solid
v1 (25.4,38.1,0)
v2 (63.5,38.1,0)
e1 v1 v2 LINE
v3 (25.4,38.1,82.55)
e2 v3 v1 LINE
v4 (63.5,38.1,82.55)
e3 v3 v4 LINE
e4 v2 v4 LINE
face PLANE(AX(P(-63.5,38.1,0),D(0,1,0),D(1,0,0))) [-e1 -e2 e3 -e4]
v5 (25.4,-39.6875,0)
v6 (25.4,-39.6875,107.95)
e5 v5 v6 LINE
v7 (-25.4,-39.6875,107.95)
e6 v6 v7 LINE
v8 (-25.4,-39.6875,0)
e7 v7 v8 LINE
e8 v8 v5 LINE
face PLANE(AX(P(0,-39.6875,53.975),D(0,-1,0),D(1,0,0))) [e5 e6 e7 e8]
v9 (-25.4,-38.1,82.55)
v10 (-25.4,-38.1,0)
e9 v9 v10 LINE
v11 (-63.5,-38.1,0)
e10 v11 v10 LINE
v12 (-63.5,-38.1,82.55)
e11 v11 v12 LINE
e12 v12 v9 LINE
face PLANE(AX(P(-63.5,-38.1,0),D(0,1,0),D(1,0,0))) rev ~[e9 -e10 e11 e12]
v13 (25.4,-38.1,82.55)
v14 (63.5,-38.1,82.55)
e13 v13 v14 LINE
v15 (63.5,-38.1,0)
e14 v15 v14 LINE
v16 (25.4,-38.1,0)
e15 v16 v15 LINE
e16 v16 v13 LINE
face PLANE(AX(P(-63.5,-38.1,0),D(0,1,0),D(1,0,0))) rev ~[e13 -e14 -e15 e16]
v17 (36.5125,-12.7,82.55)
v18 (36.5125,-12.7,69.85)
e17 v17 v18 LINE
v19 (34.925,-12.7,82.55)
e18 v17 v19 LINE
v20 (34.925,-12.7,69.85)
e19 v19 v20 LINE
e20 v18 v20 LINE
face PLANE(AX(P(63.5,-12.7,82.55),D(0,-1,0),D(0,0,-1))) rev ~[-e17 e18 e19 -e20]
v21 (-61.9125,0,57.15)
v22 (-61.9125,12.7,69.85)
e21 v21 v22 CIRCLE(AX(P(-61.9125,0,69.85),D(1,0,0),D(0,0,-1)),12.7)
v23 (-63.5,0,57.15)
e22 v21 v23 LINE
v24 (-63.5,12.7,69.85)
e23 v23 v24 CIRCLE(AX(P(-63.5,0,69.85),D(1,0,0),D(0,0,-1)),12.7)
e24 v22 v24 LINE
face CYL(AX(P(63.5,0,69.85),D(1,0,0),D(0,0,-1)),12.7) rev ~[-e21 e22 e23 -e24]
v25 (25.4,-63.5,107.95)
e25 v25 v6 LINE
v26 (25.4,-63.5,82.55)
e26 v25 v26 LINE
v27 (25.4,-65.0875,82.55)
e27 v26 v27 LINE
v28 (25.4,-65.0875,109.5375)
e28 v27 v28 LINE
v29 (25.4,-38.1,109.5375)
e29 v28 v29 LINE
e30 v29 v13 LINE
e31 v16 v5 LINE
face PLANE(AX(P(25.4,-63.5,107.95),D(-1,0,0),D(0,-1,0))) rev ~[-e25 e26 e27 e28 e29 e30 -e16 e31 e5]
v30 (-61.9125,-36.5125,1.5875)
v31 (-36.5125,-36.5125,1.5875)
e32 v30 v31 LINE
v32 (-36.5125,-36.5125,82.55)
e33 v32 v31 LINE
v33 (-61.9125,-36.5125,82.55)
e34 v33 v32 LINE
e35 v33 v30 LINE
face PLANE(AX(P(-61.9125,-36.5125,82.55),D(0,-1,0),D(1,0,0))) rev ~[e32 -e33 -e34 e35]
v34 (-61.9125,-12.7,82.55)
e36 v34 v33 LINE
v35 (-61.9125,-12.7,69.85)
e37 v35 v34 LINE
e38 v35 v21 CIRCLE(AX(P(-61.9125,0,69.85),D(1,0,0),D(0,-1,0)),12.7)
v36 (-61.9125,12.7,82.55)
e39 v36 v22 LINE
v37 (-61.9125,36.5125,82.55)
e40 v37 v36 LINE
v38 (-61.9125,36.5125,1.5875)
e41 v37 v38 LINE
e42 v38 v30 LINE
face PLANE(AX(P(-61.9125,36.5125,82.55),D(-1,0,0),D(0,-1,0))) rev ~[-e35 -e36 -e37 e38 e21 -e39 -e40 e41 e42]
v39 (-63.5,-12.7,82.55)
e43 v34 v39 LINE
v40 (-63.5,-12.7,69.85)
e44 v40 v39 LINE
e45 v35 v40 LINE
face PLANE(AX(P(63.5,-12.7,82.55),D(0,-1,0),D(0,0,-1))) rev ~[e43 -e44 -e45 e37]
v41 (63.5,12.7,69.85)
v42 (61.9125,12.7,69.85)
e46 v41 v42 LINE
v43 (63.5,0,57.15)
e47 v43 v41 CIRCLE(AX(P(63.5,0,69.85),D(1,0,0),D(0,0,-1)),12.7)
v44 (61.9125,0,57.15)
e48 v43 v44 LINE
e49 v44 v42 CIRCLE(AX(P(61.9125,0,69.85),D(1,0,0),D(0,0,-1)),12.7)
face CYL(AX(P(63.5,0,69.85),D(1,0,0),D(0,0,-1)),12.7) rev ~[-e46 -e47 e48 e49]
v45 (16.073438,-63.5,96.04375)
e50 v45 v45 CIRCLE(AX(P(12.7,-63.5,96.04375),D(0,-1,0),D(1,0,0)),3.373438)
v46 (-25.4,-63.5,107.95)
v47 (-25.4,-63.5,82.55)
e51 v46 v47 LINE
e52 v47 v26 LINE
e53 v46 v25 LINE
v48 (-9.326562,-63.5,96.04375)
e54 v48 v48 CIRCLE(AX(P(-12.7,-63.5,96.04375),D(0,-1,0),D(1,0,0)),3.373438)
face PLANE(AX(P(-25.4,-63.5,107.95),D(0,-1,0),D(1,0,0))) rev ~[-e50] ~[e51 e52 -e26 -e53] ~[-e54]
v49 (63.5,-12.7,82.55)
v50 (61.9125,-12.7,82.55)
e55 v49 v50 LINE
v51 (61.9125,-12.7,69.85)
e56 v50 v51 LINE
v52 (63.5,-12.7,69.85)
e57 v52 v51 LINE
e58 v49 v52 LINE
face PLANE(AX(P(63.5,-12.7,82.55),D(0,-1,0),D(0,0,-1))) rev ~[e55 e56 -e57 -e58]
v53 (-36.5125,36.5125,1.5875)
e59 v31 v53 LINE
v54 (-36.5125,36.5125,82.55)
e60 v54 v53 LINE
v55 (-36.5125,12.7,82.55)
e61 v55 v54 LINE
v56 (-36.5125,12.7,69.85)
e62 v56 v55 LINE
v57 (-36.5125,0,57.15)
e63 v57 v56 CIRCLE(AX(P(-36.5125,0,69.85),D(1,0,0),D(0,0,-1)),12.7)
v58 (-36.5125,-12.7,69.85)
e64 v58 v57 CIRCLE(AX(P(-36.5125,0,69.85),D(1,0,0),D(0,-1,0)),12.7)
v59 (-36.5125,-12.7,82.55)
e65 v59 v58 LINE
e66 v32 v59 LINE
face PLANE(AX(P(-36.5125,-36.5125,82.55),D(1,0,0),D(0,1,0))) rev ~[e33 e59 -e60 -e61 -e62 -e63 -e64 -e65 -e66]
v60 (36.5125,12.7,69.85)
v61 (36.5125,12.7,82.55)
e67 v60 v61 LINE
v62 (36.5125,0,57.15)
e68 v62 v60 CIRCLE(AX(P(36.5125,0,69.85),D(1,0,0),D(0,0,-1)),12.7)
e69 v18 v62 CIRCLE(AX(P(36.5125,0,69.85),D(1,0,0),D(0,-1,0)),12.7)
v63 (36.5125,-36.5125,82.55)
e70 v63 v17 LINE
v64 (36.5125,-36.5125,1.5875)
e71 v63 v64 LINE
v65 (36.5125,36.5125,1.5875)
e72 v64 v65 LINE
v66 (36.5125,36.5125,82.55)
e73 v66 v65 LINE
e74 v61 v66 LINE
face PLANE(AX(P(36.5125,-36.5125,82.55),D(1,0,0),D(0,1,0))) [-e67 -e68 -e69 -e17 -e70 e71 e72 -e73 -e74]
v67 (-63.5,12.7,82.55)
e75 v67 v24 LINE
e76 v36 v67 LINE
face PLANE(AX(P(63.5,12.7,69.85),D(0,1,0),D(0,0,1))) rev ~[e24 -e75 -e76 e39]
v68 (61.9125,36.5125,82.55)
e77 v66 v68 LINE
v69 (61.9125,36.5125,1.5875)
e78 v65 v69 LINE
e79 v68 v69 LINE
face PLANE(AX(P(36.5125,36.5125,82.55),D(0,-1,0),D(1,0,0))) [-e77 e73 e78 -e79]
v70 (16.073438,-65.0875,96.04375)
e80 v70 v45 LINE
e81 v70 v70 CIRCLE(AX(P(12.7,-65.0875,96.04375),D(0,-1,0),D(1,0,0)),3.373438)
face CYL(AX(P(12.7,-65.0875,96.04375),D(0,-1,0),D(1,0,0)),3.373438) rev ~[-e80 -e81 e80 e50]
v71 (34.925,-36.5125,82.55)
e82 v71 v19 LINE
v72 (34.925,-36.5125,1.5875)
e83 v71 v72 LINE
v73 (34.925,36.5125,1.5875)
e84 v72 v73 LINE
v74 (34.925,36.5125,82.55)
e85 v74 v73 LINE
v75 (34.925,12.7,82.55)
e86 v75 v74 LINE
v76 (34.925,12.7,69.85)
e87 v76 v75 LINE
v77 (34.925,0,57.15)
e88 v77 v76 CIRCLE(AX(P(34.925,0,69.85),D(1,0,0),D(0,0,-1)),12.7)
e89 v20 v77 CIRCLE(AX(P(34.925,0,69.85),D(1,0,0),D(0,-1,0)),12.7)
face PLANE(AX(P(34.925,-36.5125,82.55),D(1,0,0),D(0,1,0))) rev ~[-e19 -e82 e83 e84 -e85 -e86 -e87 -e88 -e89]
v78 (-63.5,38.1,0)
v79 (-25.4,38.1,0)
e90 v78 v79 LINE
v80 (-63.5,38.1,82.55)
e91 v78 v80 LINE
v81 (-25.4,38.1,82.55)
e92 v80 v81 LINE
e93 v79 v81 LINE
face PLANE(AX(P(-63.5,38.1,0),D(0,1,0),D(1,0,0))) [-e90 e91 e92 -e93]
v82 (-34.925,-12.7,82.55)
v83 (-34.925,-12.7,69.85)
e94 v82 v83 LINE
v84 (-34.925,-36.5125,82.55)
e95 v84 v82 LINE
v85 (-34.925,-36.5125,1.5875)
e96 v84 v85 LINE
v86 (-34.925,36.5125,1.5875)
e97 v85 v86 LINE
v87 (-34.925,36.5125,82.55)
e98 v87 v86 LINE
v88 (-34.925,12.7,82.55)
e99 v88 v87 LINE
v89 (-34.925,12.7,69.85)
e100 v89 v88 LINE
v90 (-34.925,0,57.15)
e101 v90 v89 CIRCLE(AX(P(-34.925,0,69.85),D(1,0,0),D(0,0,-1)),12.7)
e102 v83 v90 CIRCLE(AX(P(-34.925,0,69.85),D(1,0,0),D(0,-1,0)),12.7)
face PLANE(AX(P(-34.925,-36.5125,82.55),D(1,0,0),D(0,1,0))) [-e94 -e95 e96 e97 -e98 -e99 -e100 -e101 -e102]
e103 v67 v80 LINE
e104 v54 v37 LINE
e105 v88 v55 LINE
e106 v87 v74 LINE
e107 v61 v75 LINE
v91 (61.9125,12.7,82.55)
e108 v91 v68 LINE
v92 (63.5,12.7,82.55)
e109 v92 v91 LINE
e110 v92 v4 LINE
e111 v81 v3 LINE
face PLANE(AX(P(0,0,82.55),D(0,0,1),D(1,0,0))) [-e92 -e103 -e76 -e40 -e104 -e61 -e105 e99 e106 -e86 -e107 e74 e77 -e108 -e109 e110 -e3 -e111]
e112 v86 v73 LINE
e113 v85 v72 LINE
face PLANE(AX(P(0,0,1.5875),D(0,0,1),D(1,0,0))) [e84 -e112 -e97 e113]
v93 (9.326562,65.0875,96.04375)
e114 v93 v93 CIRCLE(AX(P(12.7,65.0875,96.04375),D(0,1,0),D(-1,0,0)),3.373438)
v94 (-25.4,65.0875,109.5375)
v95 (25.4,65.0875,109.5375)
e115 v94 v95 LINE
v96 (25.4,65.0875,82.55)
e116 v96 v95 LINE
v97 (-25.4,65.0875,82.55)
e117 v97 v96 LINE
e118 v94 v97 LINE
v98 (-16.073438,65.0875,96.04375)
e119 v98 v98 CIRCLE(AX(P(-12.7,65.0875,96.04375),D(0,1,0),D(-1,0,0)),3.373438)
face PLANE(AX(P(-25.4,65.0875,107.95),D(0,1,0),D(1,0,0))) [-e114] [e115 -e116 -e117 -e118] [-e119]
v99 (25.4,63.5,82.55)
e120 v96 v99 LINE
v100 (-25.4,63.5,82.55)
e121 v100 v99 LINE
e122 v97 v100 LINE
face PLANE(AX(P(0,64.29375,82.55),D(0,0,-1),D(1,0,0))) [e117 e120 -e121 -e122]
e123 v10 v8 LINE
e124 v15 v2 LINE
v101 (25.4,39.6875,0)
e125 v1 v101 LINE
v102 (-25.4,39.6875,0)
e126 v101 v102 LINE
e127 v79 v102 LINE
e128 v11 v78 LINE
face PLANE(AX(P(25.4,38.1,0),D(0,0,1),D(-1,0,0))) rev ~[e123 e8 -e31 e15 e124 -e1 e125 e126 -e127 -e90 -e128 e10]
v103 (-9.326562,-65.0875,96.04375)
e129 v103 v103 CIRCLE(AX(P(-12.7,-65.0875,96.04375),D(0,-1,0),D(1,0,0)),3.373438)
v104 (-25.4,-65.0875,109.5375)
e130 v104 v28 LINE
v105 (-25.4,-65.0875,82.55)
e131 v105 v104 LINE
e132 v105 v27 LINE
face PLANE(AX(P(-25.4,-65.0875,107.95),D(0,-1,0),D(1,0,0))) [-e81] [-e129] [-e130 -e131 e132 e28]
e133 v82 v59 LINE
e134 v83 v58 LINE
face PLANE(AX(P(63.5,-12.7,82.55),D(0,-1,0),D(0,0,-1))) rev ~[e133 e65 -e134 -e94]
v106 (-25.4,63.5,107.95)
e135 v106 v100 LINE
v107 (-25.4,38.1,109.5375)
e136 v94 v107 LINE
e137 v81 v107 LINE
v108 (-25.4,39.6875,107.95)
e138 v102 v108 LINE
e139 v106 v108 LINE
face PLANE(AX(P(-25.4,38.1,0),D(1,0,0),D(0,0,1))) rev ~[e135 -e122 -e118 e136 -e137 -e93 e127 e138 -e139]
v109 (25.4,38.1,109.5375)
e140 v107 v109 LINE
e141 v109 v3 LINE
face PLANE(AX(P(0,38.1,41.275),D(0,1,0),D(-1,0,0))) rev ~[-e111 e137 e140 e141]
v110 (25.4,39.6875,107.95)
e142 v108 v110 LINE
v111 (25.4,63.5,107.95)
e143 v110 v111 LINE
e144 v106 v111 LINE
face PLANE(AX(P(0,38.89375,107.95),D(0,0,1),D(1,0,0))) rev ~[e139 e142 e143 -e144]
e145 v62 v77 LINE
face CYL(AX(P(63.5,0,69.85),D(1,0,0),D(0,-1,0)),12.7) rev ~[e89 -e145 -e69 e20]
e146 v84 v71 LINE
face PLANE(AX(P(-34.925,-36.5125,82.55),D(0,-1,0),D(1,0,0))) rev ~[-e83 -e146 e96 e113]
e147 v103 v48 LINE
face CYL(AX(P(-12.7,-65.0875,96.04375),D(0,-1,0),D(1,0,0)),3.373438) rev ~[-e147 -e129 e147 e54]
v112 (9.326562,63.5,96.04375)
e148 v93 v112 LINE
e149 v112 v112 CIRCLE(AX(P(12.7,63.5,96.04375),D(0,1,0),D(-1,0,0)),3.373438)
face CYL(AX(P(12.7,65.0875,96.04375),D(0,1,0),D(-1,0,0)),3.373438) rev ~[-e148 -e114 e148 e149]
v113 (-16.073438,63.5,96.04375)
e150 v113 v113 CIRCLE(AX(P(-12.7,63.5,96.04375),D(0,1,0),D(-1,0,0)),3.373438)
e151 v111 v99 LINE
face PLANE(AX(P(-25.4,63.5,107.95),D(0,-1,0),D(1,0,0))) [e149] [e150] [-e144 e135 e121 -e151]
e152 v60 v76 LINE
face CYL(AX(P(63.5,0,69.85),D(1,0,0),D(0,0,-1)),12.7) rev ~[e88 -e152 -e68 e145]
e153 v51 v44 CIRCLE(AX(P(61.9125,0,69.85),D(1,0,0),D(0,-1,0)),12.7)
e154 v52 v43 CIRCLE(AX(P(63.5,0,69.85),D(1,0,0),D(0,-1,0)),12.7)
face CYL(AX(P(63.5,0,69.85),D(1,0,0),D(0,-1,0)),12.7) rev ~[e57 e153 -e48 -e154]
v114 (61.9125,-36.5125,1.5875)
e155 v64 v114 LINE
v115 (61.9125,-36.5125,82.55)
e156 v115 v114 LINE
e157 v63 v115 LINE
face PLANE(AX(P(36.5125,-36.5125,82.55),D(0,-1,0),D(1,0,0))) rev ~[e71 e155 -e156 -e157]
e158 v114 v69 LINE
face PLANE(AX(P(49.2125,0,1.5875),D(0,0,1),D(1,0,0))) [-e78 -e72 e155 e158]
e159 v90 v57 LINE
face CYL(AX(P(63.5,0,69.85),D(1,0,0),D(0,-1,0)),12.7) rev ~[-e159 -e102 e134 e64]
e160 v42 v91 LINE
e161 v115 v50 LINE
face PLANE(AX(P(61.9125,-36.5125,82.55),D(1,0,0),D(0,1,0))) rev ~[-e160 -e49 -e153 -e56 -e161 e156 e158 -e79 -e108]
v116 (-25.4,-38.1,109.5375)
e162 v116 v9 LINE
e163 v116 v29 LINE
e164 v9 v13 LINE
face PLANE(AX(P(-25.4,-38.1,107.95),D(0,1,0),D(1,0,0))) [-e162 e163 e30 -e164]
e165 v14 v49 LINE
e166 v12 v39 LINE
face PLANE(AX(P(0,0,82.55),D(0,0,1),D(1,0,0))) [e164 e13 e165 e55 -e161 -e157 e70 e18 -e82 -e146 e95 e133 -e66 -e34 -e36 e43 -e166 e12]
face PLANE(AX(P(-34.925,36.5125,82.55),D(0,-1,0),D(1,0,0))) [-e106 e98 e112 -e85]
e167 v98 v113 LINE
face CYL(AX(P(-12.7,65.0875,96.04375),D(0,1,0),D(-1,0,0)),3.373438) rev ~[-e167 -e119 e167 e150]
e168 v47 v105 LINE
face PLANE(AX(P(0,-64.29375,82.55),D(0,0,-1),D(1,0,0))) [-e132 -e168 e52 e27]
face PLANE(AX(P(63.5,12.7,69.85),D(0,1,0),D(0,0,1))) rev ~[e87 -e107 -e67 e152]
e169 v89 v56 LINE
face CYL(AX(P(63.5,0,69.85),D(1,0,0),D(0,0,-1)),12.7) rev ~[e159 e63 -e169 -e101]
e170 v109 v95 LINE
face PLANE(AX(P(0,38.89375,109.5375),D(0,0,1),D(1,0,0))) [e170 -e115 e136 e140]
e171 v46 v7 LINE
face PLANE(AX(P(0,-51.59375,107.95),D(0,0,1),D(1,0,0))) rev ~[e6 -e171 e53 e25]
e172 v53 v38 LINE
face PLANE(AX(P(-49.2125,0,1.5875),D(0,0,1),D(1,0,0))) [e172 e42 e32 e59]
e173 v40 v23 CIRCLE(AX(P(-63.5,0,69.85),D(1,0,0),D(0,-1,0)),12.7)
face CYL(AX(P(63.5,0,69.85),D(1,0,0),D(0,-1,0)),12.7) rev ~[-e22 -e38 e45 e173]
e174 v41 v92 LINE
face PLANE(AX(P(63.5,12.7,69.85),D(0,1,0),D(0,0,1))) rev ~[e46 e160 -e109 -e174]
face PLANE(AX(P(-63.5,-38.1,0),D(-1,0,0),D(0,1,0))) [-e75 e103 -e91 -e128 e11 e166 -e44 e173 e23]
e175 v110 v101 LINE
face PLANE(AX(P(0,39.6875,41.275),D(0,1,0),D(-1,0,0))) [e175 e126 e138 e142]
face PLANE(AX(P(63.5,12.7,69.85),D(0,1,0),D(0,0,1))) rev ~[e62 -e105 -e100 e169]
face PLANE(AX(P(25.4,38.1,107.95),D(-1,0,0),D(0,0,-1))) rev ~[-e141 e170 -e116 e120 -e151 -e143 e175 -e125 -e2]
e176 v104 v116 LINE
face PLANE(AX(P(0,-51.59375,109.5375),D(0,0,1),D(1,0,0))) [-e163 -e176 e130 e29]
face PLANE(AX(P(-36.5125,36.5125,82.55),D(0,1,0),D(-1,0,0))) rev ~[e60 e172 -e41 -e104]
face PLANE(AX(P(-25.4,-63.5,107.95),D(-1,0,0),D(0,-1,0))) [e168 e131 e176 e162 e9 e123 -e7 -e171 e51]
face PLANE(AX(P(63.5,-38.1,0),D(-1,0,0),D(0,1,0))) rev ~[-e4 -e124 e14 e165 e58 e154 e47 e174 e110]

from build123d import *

# Parameters (mm, degrees)
F0_W      = 127
F0_H      = 76.2
F1_DEPTH  = 82.55
F3_W      = 25.4
F3_H      = 73.025
F3_W_2    = 69.85
F4_DEPTH  = 80.9625
F6_DEPTH  = 127.001
F8_DEPTH  = 1.5875
F10_DEPTH = 1.5875
F11_W     = 50.8
F11_H     = 26.9875
F11_H_2   = 1.5875
F11_H_3   = 25.4
F12_DEPTH = 1.5875
F13_W     = 50.8
F13_H     = 1.5875
F14_DEPTH = 25.4
F15_R     = 3.3734375
F16_DEPTH = 1.5875
F17_R     = 3.3734375
F18_DEPTH = 1.5875


# Not quite as in the source:
# - a length typed as a fraction of an inch, garbled in the dataset ("3 / 203.2 mm" for 3/8 in), is restored


with BuildPart() as f1:
    # F0 (on Top) → F1 (new body)
    with BuildSketch(Plane.XY):
        Rectangle(F0_W, F0_H)
    extrude(amount=F1_DEPTH)

    # F3 (on face) → F4 (cut)
    with BuildSketch(Plane.XY.offset(82.55)):
        Polygon((-61.9125, 36.5125), (-61.9125, 0), (-61.9125, -36.5125), (-36.5125, -36.5125), (-36.5125, 36.5125), align=None)
        with Locations((49.2125, 0)):
            Rectangle(F3_W, F3_H)
        Rectangle(F3_W_2, F3_H)
    extrude(amount=-F4_DEPTH, mode=Mode.SUBTRACT)

    # F5 (on face) → F6 (cut, through all)
    with BuildSketch(Plane.YZ.offset(63.5)):
        with BuildLine():
            Line((12.7, 69.85), (12.7, 82.55))
            Line((12.7, 82.55), (0, 82.55))
            Line((0, 82.55), (-12.7, 82.55))
            Line((-12.7, 82.55), (-12.7, 69.85))
            ThreePointArc((-12.7, 69.85), (-8.9802561211, 60.8697438789), (0, 57.15))
            ThreePointArc((0, 57.15), (8.9802561211, 60.8697438789), (12.7, 69.85))
        make_face()
    extrude(amount=-F6_DEPTH, mode=Mode.SUBTRACT)

    # F7 (on face) → F8 (join)
    with BuildSketch(Plane.XZ.offset(38.1)):
        Polygon((-12.7, 0), (0, 0), (12.7, 0), (25.4, 0), (25.4, 107.95), (12.7, 107.95), (-12.7, 107.95), (-25.4, 107.95), (-25.4, 0), align=None)
    extrude(amount=F8_DEPTH)

    # F9 (on face) → F10 (join)
    with BuildSketch(Plane(origin=(0, 38.1, 0), x_dir=(-1, 0, 0), z_dir=(0, 1, 0))):
        Polygon((-12.7, 0), (0, 0), (12.7, 0), (25.4, 0), (25.4, 82.55), (-25.4, 82.55), (-25.4, 0), align=None)
        Polygon((-25.4, 82.55), (25.4, 82.55), (25.4, 107.95), (12.7, 107.95), (-12.7, 107.95), (-25.4, 107.95), align=None)
    extrude(amount=F10_DEPTH)

    # F11 (on face) → F12 (join)
    with BuildSketch(Plane.XY.offset(107.95)):
        with Locations((0, -51.59375)):
            Rectangle(F11_W, F11_H)
        with Locations((0, 38.89375)):
            Rectangle(F11_W, F11_H_2)
        with Locations((0, 52.3875)):
            Rectangle(F11_W, F11_H_3)
    extrude(amount=F12_DEPTH)

    # F13 (on face) → F14 (join)
    with BuildSketch(Plane(origin=(0, 0, 107.95), x_dir=(1, 0, 0), z_dir=(0, 0, -1))):
        with Locations((0, 64.29375)):
            Rectangle(F13_W, F13_H)
        with Locations((0, -64.29375)):
            Rectangle(F13_W, F13_H)
    extrude(amount=F14_DEPTH)

    # F15 (on face) → F16 (cut)
    with BuildSketch(Plane.XZ.offset(65.0875)):
        with Locations((12.7, 96.04375)):
            Circle(F15_R)
        with Locations((-12.7, 96.04375)):
            Circle(F15_R)
    extrude(amount=-F16_DEPTH, mode=Mode.SUBTRACT)

    # F17 (on face) → F18 (cut)
    with BuildSketch(Plane(origin=(0, 65.0875, 0), x_dir=(-1, 0, 0), z_dir=(0, 1, 0))):
        with Locations((12.7, 96.04375)):
            Circle(F17_R)
        with Locations((-12.7, 96.04375)):
            Circle(F17_R)
    extrude(amount=-F18_DEPTH, mode=Mode.SUBTRACT)


solid = f1.part
